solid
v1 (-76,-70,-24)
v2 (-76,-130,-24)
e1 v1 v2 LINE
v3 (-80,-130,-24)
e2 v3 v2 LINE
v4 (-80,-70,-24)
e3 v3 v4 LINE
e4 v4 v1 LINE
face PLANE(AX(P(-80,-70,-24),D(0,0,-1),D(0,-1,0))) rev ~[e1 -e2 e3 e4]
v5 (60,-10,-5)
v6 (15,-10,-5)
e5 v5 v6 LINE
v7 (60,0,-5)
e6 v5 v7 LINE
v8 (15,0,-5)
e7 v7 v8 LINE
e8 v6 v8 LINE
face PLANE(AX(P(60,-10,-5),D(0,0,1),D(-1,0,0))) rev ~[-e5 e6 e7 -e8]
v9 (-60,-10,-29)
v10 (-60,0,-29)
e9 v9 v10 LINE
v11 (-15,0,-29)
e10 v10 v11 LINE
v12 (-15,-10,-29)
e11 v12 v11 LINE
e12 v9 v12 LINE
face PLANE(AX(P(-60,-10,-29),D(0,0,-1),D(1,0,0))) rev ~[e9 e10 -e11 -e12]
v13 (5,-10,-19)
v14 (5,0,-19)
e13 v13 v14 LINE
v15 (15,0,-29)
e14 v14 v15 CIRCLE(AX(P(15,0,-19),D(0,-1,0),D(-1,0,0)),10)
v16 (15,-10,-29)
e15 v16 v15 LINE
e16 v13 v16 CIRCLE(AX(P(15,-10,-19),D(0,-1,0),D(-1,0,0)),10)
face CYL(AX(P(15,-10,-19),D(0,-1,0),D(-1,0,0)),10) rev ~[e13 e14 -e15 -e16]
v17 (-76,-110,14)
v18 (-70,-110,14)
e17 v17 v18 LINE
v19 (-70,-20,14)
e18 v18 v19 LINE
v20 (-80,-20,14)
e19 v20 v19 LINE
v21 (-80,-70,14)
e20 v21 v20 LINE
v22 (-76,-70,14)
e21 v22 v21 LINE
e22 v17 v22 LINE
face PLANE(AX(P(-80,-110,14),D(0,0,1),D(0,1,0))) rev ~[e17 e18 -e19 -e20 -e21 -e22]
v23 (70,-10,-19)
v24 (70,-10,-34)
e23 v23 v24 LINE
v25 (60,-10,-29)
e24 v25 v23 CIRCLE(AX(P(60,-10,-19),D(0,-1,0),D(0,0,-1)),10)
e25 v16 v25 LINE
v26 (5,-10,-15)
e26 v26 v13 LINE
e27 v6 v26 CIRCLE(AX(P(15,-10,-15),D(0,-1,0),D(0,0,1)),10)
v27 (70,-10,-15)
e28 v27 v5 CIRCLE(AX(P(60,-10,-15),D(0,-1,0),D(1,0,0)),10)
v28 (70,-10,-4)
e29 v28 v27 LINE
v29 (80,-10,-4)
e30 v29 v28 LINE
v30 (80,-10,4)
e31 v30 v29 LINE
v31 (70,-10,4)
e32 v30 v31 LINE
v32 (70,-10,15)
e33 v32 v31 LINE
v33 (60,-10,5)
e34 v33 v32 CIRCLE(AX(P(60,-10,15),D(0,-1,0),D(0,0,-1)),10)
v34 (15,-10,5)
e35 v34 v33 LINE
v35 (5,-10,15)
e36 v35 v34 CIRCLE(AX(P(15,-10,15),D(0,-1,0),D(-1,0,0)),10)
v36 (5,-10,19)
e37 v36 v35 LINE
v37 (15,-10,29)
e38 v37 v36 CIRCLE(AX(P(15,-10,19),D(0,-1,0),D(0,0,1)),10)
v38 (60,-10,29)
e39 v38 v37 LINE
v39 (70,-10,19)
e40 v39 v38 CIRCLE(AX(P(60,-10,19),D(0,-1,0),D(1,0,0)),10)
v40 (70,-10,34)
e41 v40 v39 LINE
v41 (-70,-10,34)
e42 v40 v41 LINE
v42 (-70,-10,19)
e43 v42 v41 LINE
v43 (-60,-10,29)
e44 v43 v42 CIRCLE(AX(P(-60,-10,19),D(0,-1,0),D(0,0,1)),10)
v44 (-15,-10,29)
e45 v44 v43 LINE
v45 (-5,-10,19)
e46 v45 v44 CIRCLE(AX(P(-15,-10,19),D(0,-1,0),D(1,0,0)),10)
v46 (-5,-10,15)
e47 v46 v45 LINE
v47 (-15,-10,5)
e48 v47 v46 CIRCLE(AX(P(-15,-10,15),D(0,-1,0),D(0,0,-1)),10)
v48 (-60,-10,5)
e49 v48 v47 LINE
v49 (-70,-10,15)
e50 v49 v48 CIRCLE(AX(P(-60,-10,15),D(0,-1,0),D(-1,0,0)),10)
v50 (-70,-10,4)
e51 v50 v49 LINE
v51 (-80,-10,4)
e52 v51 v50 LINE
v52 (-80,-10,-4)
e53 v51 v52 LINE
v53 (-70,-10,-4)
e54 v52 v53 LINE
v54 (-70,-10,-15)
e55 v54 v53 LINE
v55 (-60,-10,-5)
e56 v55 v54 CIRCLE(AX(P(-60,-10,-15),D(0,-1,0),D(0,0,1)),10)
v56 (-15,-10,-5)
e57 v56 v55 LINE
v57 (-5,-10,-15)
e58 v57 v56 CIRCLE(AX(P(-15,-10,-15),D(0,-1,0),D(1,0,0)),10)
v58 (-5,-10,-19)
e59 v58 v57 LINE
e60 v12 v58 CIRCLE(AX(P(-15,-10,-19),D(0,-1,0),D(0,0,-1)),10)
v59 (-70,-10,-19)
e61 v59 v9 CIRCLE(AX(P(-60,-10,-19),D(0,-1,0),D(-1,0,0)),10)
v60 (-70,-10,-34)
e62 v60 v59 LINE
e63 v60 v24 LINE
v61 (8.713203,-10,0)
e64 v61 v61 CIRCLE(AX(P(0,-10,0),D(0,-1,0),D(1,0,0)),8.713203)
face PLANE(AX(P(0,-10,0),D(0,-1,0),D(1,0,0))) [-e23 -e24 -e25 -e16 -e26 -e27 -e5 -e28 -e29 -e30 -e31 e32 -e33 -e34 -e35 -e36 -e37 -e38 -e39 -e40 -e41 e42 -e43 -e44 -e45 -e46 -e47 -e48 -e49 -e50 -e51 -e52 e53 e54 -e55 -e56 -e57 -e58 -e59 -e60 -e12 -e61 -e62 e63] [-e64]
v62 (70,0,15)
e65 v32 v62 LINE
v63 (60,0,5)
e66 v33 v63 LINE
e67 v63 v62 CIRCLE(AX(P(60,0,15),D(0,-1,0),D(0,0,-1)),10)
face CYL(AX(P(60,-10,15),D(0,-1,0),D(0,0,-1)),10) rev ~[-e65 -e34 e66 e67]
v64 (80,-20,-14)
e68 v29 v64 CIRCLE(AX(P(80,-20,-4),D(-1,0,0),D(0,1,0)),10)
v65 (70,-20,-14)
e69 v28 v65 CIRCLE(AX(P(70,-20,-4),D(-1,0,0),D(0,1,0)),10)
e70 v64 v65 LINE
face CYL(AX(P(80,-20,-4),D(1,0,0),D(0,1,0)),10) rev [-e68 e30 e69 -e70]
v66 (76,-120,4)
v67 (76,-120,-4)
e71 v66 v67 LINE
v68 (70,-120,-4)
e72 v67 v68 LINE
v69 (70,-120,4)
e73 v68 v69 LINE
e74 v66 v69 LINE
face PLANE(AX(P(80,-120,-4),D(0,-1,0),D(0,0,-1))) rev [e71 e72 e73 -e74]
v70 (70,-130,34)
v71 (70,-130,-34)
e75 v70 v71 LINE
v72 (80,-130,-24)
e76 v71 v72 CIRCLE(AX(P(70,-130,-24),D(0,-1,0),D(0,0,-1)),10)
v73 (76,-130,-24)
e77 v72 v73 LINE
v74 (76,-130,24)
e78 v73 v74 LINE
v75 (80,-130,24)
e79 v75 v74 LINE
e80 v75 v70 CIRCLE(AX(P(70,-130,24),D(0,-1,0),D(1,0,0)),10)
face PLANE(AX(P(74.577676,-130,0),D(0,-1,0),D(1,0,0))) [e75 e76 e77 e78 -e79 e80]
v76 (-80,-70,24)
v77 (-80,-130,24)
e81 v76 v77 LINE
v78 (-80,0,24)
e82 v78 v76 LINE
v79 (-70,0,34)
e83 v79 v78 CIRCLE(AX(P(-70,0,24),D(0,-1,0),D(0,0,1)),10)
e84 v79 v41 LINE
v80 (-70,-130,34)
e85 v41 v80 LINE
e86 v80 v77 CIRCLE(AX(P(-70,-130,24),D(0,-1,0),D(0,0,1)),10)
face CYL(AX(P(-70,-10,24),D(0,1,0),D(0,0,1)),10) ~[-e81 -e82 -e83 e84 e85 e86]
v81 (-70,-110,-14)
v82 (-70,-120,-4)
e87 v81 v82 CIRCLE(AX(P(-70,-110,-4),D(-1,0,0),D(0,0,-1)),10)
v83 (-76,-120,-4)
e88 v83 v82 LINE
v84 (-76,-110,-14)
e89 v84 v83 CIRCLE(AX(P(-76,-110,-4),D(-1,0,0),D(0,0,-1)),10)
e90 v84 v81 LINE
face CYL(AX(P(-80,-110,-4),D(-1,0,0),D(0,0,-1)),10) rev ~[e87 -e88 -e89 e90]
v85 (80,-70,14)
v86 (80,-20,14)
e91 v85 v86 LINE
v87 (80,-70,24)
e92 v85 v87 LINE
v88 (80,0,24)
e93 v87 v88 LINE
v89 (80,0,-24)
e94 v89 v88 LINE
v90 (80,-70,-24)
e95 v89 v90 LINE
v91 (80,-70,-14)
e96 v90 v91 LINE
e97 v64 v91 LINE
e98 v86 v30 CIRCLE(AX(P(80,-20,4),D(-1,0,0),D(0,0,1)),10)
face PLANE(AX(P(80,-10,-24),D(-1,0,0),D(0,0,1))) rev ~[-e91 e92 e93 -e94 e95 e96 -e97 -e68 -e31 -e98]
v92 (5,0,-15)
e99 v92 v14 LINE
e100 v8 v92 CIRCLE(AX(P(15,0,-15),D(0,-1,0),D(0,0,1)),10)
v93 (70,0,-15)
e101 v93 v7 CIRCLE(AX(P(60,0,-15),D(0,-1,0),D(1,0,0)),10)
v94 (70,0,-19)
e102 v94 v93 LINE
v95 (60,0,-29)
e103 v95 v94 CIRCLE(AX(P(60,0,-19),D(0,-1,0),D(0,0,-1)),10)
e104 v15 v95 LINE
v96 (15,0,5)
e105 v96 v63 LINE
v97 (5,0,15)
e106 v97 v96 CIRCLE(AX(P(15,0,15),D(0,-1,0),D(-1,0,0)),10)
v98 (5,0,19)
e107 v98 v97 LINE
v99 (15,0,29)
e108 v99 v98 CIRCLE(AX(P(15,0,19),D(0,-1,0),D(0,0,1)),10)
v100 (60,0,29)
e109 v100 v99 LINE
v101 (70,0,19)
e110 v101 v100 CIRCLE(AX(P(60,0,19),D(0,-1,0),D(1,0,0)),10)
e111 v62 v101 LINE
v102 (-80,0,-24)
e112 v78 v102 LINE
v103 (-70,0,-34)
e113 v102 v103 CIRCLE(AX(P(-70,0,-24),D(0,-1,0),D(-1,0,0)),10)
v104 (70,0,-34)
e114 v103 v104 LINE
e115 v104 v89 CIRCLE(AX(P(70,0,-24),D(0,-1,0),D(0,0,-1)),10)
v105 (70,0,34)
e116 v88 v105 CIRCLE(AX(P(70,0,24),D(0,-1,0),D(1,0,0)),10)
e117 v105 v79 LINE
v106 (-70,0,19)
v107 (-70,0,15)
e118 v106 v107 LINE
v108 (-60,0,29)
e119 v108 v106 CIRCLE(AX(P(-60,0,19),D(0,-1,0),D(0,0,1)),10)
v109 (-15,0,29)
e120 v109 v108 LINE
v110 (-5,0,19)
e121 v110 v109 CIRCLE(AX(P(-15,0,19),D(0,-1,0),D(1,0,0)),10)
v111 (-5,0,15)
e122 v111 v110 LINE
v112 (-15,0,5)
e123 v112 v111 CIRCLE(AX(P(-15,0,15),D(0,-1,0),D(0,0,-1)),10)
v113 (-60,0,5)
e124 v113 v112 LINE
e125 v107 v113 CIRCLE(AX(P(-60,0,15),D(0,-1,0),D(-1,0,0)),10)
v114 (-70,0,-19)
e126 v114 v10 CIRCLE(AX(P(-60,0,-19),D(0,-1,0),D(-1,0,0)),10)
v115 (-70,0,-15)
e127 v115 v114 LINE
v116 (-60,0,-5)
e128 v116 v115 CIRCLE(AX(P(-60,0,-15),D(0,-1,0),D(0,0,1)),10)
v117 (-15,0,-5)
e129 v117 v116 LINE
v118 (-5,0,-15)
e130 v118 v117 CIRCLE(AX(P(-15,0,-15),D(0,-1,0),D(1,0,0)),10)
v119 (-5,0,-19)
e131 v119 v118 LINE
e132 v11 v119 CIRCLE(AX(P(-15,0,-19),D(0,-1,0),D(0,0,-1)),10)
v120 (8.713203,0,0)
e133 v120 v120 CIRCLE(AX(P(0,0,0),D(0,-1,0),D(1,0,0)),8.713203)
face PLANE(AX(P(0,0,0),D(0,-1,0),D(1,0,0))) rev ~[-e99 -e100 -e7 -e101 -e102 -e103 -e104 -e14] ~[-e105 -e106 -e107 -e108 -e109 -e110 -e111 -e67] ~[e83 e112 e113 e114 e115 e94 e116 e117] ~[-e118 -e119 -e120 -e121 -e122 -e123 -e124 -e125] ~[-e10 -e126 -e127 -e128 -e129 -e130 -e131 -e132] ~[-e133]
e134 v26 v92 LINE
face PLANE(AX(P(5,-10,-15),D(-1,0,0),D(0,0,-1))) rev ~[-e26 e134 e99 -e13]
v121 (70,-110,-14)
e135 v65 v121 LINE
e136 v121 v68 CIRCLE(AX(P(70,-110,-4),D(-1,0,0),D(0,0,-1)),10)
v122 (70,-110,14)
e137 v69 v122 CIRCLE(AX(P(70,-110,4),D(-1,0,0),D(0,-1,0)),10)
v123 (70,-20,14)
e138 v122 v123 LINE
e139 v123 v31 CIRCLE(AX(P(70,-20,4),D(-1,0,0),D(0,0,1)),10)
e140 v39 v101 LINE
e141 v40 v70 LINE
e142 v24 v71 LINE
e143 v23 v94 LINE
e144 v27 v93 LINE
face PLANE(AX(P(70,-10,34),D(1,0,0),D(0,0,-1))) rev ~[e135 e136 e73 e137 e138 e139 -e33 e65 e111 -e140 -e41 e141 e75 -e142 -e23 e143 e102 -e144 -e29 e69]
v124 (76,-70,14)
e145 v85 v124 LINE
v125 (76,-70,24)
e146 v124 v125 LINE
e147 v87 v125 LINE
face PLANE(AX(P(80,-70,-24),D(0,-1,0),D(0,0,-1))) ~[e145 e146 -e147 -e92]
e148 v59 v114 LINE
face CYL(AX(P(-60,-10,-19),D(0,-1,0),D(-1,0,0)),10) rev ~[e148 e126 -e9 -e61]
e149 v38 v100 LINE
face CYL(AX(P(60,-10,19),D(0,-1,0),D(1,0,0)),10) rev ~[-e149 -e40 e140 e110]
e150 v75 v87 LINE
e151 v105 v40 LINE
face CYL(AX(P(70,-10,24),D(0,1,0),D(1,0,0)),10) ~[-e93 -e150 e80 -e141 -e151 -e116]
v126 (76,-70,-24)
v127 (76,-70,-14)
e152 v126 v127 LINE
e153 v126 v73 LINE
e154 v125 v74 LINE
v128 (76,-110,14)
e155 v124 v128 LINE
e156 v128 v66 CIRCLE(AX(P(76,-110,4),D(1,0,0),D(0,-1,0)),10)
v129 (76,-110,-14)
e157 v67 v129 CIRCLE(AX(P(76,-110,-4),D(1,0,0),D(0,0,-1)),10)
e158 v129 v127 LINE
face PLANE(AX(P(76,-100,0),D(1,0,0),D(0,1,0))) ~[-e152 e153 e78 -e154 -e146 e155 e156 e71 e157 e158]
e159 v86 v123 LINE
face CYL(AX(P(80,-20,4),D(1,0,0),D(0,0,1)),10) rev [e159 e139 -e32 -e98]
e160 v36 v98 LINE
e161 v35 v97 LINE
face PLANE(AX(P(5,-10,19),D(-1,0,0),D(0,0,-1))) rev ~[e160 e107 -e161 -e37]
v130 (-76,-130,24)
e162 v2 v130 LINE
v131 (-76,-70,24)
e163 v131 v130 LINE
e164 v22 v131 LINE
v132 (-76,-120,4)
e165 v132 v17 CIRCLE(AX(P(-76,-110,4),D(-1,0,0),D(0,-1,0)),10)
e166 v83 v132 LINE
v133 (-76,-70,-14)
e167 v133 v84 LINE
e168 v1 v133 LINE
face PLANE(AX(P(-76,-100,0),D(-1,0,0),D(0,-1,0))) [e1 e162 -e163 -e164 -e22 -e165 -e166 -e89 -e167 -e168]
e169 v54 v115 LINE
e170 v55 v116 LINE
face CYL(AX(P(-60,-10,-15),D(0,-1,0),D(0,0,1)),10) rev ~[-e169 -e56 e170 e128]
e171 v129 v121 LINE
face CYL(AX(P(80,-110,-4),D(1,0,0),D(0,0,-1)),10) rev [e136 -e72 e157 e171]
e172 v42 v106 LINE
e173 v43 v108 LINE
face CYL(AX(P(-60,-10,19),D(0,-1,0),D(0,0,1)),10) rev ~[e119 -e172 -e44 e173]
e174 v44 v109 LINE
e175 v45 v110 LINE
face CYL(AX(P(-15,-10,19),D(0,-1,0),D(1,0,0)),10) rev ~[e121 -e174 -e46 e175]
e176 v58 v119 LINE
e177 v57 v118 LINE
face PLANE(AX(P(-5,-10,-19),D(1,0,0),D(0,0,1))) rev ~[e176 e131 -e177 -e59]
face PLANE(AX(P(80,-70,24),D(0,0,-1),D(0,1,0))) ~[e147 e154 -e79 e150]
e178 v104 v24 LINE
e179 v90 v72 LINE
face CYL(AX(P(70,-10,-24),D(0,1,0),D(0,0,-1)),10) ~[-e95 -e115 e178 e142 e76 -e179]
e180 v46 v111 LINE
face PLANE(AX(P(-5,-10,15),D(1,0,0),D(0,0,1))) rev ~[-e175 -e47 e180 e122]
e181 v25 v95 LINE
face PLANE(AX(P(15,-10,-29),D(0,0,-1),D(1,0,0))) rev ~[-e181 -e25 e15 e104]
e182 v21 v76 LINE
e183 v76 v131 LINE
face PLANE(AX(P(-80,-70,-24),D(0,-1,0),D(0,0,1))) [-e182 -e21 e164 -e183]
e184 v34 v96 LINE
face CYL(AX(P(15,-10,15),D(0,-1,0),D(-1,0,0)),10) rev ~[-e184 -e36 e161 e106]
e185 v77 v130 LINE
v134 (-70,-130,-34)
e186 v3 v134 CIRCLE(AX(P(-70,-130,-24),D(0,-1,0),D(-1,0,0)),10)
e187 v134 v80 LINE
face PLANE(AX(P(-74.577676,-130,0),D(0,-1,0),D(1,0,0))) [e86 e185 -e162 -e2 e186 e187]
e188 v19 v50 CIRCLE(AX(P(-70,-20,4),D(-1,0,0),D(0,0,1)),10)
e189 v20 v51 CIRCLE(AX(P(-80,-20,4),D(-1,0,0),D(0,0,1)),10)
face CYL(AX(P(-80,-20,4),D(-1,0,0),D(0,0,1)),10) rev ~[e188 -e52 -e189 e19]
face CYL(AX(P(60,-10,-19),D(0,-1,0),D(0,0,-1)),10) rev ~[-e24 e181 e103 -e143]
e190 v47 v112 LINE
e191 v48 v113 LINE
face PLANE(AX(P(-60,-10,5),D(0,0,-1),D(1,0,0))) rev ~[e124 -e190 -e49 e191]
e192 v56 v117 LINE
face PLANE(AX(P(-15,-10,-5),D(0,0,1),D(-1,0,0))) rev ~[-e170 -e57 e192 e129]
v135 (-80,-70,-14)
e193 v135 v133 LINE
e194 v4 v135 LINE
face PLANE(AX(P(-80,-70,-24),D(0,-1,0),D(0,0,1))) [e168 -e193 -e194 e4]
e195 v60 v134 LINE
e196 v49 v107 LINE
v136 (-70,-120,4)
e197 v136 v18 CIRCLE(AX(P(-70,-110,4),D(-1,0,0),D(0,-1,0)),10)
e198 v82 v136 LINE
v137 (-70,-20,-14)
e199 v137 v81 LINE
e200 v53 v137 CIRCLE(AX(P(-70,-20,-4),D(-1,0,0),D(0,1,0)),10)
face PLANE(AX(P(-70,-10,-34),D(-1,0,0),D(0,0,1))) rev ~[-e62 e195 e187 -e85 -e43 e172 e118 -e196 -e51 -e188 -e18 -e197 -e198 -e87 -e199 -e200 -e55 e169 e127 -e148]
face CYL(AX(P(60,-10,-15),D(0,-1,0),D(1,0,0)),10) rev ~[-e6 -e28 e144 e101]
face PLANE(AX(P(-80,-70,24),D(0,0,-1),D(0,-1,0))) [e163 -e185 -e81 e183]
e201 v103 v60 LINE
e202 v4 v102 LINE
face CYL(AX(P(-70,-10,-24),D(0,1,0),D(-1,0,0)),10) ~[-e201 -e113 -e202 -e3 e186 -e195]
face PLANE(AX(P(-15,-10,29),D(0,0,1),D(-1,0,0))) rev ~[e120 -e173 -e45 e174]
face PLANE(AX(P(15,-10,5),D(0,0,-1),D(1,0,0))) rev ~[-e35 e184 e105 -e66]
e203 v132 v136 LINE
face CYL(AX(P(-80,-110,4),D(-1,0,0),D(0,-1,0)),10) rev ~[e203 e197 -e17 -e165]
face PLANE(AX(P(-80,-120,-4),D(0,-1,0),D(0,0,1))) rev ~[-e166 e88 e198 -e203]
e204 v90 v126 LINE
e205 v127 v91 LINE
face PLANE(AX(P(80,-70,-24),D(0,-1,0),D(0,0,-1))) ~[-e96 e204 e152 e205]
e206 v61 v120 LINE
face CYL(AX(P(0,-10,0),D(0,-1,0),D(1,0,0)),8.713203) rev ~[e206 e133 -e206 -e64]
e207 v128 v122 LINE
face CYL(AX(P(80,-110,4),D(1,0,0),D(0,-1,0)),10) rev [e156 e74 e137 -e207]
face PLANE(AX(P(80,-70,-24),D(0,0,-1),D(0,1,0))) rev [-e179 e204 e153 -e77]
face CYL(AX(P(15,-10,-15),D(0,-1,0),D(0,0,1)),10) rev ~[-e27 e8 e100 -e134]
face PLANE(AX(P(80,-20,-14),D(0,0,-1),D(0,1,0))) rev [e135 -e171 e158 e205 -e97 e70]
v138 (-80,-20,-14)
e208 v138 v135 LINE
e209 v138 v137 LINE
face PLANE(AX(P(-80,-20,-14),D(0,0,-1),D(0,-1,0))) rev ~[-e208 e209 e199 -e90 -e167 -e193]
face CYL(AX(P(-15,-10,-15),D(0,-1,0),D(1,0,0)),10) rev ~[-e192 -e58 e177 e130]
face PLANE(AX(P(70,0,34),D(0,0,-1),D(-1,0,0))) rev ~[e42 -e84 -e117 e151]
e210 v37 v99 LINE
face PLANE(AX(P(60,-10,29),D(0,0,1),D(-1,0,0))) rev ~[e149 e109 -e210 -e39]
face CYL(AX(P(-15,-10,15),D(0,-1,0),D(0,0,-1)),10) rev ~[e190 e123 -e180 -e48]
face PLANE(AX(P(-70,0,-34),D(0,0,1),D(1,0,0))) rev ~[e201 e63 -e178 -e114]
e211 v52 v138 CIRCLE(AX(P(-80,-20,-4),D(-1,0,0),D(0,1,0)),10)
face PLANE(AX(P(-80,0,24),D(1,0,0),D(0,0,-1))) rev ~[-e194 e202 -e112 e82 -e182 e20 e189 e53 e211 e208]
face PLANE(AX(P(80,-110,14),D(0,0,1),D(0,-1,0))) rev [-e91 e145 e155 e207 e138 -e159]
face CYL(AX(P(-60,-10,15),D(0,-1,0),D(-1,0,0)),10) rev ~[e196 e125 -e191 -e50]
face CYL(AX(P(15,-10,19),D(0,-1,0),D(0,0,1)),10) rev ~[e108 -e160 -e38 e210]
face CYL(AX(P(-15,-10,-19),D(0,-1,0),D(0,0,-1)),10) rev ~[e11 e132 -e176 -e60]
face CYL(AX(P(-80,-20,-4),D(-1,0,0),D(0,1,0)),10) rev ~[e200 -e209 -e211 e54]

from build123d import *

# Parameters (mm, degrees)
F1_DEPTH  = 10
F2_R      = 8.7132034356
F3_DEPTH  = 11
F4_DEPTH  = 11
F6_DEPTH  = 120
F7_W      = 60
F7_H      = 48
F8_DEPTH  = 4
F10_DEPTH = 10


# Not quite as in the source:
# - a pattern or mirror of a feature is missing from the dataset's text; its kind, count and spacing are read off the source's solid


with BuildPart() as f1:
    # F0 (on Front) → F1 (new body)
    with BuildSketch(Plane.XZ):
        with BuildLine():
            Line((-70, -34), (70, -34))
            ThreePointArc((70, -34), (77.0710678119, -31.0710678119), (80, -24))
            Line((80, -24), (80, 24))
            ThreePointArc((80, 24), (77.0710678119, 31.0710678119), (70, 34))
            Line((70, 34), (-70, 34))
            ThreePointArc((-70, 34), (-77.0710678119, 31.0710678119), (-80, 24))
            Line((-80, 24), (-80, -24))
            ThreePointArc((-80, -24), (-77.0710678119, -31.0710678119), (-70, -34))
        make_face()
    extrude(amount=F1_DEPTH)

    # F2 (on face) → F3 (cut)
    with BuildSketch(Plane.XZ.offset(10)):
        with BuildLine():
            Line((15, 5), (60, 5))
            ThreePointArc((60, 5), (67.0710678119, 7.9289321881), (70, 15))
            Line((70, 15), (70, 19))
            ThreePointArc((70, 19), (67.0710678119, 26.0710678119), (60, 29))
            Line((60, 29), (15, 29))
            ThreePointArc((15, 29), (7.9289321881, 26.0710678119), (5, 19))
            Line((5, 19), (5, 15))
            ThreePointArc((5, 15), (7.9289321881, 7.9289321881), (15, 5))
        make_face()
        with BuildLine():
            ThreePointArc((70, -15), (67.0710678119, -7.9289321881), (60, -5))
            Line((60, -5), (15, -5))
            ThreePointArc((15, -5), (7.9289321881, -7.9289321881), (5, -15))
            Line((5, -15), (5, -19))
            ThreePointArc((5, -19), (7.9289321881, -26.0710678119), (15, -29))
            Line((15, -29), (60, -29))
            ThreePointArc((60, -29), (67.0710678119, -26.0710678119), (70, -19))
            Line((70, -19), (70, -15))
        make_face()
        with BuildLine():
            Line((-15, -5), (-60, -5))
            ThreePointArc((-60, -5), (-67.0710678119, -7.9289321881), (-70, -15))
            Line((-70, -15), (-70, -19))
            ThreePointArc((-70, -19), (-67.0710678119, -26.0710678119), (-60, -29))
            Line((-60, -29), (-15, -29))
            ThreePointArc((-15, -29), (-7.9289321881, -26.0710678119), (-5, -19))
            Line((-5, -19), (-5, -15))
            ThreePointArc((-5, -15), (-7.9289321881, -7.9289321881), (-15, -5))
        make_face()
        with BuildLine():
            ThreePointArc((-5, 19), (-7.9289321881, 26.0710678119), (-15, 29))
            Line((-15, 29), (-60, 29))
            ThreePointArc((-60, 29), (-67.0710678119, 26.0710678119), (-70, 19))
            Line((-70, 19), (-70, 15))
            ThreePointArc((-70, 15), (-67.0710678119, 7.9289321881), (-60, 5))
            Line((-60, 5), (-15, 5))
            ThreePointArc((-15, 5), (-7.9289321881, 7.9289321881), (-5, 15))
            Line((-5, 15), (-5, 19))
        make_face()
        Circle(F2_R)
    extrude(amount=-F3_DEPTH, mode=Mode.SUBTRACT)

    # F2 (on face) → F4 (cut)
    with BuildSketch(Plane.XZ.offset(10)):
        with BuildLine():
            Line((15, 5), (60, 5))
            ThreePointArc((60, 5), (67.0710678119, 7.9289321881), (70, 15))
            Line((70, 15), (70, 19))
            ThreePointArc((70, 19), (67.0710678119, 26.0710678119), (60, 29))
            Line((60, 29), (15, 29))
            ThreePointArc((15, 29), (7.9289321881, 26.0710678119), (5, 19))
            Line((5, 19), (5, 15))
            ThreePointArc((5, 15), (7.9289321881, 7.9289321881), (15, 5))
        make_face()
        with BuildLine():
            ThreePointArc((70, -15), (67.0710678119, -7.9289321881), (60, -5))
            Line((60, -5), (15, -5))
            ThreePointArc((15, -5), (7.9289321881, -7.9289321881), (5, -15))
            Line((5, -15), (5, -19))
            ThreePointArc((5, -19), (7.9289321881, -26.0710678119), (15, -29))
            Line((15, -29), (60, -29))
            ThreePointArc((60, -29), (67.0710678119, -26.0710678119), (70, -19))
            Line((70, -19), (70, -15))
        make_face()
        with BuildLine():
            Line((-15, -5), (-60, -5))
            ThreePointArc((-60, -5), (-67.0710678119, -7.9289321881), (-70, -15))
            Line((-70, -15), (-70, -19))
            ThreePointArc((-70, -19), (-67.0710678119, -26.0710678119), (-60, -29))
            Line((-60, -29), (-15, -29))
            ThreePointArc((-15, -29), (-7.9289321881, -26.0710678119), (-5, -19))
            Line((-5, -19), (-5, -15))
            ThreePointArc((-5, -15), (-7.9289321881, -7.9289321881), (-15, -5))
        make_face()
        with BuildLine():
            ThreePointArc((-5, 19), (-7.9289321881, 26.0710678119), (-15, 29))
            Line((-15, 29), (-60, 29))
            ThreePointArc((-60, 29), (-67.0710678119, 26.0710678119), (-70, 19))
            Line((-70, 19), (-70, 15))
            ThreePointArc((-70, 15), (-67.0710678119, 7.9289321881), (-60, 5))
            Line((-60, 5), (-15, 5))
            ThreePointArc((-15, 5), (-7.9289321881, 7.9289321881), (-5, 15))
            Line((-5, 15), (-5, 19))
        make_face()
        Circle(F2_R)
    extrude(amount=-F4_DEPTH, mode=Mode.SUBTRACT)

    # F5 (on face) → F6 (join)
    with BuildSketch(Plane.XZ.offset(10)):
        with BuildLine():
            Line((70, 34), (70, -34))
            ThreePointArc((70, -34), (77.0710678119, -31.0710678119), (80, -24))
            Line((80, -24), (80, 24))
            ThreePointArc((80, 24), (77.0710678119, 31.0710678119), (70, 34))
        make_face()
        with BuildLine():
            ThreePointArc((-80, -24), (-77.0710678119, -31.0710678119), (-70, -34))
            Line((-70, -34), (-70, 34))
            ThreePointArc((-70, 34), (-77.0710678119, 31.0710678119), (-80, 24))
            Line((-80, 24), (-80, -24))
        make_face()
    extrude(amount=F6_DEPTH)

    # F7 (on face) → F8 (cut)
    with BuildSketch(Plane(origin=(-80, 0, 0), x_dir=(0, -1, 0), z_dir=(-1, 0, 0))):
        with Locations((100, 0)):
            Rectangle(F7_W, F7_H)
    f8 = extrude(amount=-F8_DEPTH, mode=Mode.SUBTRACT)

    # F8_copies: F8 across plane
    add(f8.mirror(Plane(origin=(0, 0, 0), x_dir=(0, 0, 1), z_dir=(1, 0, 0))), mode=Mode.SUBTRACT)

    # F9 (on face) → F10 (cut)
    with BuildSketch(Plane(origin=(-80, 0, 0), x_dir=(0, -1, 0), z_dir=(-1, 0, 0))):
        with BuildLine():
            Line((20, -14), (110, -14))
            ThreePointArc((110, -14), (117.0710678119, -11.0710678119), (120, -4))
            Line((120, -4), (120, 4))
            ThreePointArc((120, 4), (117.0710678119, 11.0710678119), (110, 14))
            Line((110, 14), (20, 14))
            ThreePointArc((20, 14), (12.9289321881, 11.0710678119), (10, 4))
            Line((10, 4), (10, -4))
            ThreePointArc((10, -4), (12.9289321881, -11.0710678119), (20, -14))
        make_face()
    f10 = extrude(amount=-F10_DEPTH, mode=Mode.SUBTRACT)

    # F10_copies: F10 across plane
    add(f10.mirror(Plane(origin=(0, 0, 0), x_dir=(0, 0, 1), z_dir=(1, 0, 0))), mode=Mode.SUBTRACT)


solid = f1.part
